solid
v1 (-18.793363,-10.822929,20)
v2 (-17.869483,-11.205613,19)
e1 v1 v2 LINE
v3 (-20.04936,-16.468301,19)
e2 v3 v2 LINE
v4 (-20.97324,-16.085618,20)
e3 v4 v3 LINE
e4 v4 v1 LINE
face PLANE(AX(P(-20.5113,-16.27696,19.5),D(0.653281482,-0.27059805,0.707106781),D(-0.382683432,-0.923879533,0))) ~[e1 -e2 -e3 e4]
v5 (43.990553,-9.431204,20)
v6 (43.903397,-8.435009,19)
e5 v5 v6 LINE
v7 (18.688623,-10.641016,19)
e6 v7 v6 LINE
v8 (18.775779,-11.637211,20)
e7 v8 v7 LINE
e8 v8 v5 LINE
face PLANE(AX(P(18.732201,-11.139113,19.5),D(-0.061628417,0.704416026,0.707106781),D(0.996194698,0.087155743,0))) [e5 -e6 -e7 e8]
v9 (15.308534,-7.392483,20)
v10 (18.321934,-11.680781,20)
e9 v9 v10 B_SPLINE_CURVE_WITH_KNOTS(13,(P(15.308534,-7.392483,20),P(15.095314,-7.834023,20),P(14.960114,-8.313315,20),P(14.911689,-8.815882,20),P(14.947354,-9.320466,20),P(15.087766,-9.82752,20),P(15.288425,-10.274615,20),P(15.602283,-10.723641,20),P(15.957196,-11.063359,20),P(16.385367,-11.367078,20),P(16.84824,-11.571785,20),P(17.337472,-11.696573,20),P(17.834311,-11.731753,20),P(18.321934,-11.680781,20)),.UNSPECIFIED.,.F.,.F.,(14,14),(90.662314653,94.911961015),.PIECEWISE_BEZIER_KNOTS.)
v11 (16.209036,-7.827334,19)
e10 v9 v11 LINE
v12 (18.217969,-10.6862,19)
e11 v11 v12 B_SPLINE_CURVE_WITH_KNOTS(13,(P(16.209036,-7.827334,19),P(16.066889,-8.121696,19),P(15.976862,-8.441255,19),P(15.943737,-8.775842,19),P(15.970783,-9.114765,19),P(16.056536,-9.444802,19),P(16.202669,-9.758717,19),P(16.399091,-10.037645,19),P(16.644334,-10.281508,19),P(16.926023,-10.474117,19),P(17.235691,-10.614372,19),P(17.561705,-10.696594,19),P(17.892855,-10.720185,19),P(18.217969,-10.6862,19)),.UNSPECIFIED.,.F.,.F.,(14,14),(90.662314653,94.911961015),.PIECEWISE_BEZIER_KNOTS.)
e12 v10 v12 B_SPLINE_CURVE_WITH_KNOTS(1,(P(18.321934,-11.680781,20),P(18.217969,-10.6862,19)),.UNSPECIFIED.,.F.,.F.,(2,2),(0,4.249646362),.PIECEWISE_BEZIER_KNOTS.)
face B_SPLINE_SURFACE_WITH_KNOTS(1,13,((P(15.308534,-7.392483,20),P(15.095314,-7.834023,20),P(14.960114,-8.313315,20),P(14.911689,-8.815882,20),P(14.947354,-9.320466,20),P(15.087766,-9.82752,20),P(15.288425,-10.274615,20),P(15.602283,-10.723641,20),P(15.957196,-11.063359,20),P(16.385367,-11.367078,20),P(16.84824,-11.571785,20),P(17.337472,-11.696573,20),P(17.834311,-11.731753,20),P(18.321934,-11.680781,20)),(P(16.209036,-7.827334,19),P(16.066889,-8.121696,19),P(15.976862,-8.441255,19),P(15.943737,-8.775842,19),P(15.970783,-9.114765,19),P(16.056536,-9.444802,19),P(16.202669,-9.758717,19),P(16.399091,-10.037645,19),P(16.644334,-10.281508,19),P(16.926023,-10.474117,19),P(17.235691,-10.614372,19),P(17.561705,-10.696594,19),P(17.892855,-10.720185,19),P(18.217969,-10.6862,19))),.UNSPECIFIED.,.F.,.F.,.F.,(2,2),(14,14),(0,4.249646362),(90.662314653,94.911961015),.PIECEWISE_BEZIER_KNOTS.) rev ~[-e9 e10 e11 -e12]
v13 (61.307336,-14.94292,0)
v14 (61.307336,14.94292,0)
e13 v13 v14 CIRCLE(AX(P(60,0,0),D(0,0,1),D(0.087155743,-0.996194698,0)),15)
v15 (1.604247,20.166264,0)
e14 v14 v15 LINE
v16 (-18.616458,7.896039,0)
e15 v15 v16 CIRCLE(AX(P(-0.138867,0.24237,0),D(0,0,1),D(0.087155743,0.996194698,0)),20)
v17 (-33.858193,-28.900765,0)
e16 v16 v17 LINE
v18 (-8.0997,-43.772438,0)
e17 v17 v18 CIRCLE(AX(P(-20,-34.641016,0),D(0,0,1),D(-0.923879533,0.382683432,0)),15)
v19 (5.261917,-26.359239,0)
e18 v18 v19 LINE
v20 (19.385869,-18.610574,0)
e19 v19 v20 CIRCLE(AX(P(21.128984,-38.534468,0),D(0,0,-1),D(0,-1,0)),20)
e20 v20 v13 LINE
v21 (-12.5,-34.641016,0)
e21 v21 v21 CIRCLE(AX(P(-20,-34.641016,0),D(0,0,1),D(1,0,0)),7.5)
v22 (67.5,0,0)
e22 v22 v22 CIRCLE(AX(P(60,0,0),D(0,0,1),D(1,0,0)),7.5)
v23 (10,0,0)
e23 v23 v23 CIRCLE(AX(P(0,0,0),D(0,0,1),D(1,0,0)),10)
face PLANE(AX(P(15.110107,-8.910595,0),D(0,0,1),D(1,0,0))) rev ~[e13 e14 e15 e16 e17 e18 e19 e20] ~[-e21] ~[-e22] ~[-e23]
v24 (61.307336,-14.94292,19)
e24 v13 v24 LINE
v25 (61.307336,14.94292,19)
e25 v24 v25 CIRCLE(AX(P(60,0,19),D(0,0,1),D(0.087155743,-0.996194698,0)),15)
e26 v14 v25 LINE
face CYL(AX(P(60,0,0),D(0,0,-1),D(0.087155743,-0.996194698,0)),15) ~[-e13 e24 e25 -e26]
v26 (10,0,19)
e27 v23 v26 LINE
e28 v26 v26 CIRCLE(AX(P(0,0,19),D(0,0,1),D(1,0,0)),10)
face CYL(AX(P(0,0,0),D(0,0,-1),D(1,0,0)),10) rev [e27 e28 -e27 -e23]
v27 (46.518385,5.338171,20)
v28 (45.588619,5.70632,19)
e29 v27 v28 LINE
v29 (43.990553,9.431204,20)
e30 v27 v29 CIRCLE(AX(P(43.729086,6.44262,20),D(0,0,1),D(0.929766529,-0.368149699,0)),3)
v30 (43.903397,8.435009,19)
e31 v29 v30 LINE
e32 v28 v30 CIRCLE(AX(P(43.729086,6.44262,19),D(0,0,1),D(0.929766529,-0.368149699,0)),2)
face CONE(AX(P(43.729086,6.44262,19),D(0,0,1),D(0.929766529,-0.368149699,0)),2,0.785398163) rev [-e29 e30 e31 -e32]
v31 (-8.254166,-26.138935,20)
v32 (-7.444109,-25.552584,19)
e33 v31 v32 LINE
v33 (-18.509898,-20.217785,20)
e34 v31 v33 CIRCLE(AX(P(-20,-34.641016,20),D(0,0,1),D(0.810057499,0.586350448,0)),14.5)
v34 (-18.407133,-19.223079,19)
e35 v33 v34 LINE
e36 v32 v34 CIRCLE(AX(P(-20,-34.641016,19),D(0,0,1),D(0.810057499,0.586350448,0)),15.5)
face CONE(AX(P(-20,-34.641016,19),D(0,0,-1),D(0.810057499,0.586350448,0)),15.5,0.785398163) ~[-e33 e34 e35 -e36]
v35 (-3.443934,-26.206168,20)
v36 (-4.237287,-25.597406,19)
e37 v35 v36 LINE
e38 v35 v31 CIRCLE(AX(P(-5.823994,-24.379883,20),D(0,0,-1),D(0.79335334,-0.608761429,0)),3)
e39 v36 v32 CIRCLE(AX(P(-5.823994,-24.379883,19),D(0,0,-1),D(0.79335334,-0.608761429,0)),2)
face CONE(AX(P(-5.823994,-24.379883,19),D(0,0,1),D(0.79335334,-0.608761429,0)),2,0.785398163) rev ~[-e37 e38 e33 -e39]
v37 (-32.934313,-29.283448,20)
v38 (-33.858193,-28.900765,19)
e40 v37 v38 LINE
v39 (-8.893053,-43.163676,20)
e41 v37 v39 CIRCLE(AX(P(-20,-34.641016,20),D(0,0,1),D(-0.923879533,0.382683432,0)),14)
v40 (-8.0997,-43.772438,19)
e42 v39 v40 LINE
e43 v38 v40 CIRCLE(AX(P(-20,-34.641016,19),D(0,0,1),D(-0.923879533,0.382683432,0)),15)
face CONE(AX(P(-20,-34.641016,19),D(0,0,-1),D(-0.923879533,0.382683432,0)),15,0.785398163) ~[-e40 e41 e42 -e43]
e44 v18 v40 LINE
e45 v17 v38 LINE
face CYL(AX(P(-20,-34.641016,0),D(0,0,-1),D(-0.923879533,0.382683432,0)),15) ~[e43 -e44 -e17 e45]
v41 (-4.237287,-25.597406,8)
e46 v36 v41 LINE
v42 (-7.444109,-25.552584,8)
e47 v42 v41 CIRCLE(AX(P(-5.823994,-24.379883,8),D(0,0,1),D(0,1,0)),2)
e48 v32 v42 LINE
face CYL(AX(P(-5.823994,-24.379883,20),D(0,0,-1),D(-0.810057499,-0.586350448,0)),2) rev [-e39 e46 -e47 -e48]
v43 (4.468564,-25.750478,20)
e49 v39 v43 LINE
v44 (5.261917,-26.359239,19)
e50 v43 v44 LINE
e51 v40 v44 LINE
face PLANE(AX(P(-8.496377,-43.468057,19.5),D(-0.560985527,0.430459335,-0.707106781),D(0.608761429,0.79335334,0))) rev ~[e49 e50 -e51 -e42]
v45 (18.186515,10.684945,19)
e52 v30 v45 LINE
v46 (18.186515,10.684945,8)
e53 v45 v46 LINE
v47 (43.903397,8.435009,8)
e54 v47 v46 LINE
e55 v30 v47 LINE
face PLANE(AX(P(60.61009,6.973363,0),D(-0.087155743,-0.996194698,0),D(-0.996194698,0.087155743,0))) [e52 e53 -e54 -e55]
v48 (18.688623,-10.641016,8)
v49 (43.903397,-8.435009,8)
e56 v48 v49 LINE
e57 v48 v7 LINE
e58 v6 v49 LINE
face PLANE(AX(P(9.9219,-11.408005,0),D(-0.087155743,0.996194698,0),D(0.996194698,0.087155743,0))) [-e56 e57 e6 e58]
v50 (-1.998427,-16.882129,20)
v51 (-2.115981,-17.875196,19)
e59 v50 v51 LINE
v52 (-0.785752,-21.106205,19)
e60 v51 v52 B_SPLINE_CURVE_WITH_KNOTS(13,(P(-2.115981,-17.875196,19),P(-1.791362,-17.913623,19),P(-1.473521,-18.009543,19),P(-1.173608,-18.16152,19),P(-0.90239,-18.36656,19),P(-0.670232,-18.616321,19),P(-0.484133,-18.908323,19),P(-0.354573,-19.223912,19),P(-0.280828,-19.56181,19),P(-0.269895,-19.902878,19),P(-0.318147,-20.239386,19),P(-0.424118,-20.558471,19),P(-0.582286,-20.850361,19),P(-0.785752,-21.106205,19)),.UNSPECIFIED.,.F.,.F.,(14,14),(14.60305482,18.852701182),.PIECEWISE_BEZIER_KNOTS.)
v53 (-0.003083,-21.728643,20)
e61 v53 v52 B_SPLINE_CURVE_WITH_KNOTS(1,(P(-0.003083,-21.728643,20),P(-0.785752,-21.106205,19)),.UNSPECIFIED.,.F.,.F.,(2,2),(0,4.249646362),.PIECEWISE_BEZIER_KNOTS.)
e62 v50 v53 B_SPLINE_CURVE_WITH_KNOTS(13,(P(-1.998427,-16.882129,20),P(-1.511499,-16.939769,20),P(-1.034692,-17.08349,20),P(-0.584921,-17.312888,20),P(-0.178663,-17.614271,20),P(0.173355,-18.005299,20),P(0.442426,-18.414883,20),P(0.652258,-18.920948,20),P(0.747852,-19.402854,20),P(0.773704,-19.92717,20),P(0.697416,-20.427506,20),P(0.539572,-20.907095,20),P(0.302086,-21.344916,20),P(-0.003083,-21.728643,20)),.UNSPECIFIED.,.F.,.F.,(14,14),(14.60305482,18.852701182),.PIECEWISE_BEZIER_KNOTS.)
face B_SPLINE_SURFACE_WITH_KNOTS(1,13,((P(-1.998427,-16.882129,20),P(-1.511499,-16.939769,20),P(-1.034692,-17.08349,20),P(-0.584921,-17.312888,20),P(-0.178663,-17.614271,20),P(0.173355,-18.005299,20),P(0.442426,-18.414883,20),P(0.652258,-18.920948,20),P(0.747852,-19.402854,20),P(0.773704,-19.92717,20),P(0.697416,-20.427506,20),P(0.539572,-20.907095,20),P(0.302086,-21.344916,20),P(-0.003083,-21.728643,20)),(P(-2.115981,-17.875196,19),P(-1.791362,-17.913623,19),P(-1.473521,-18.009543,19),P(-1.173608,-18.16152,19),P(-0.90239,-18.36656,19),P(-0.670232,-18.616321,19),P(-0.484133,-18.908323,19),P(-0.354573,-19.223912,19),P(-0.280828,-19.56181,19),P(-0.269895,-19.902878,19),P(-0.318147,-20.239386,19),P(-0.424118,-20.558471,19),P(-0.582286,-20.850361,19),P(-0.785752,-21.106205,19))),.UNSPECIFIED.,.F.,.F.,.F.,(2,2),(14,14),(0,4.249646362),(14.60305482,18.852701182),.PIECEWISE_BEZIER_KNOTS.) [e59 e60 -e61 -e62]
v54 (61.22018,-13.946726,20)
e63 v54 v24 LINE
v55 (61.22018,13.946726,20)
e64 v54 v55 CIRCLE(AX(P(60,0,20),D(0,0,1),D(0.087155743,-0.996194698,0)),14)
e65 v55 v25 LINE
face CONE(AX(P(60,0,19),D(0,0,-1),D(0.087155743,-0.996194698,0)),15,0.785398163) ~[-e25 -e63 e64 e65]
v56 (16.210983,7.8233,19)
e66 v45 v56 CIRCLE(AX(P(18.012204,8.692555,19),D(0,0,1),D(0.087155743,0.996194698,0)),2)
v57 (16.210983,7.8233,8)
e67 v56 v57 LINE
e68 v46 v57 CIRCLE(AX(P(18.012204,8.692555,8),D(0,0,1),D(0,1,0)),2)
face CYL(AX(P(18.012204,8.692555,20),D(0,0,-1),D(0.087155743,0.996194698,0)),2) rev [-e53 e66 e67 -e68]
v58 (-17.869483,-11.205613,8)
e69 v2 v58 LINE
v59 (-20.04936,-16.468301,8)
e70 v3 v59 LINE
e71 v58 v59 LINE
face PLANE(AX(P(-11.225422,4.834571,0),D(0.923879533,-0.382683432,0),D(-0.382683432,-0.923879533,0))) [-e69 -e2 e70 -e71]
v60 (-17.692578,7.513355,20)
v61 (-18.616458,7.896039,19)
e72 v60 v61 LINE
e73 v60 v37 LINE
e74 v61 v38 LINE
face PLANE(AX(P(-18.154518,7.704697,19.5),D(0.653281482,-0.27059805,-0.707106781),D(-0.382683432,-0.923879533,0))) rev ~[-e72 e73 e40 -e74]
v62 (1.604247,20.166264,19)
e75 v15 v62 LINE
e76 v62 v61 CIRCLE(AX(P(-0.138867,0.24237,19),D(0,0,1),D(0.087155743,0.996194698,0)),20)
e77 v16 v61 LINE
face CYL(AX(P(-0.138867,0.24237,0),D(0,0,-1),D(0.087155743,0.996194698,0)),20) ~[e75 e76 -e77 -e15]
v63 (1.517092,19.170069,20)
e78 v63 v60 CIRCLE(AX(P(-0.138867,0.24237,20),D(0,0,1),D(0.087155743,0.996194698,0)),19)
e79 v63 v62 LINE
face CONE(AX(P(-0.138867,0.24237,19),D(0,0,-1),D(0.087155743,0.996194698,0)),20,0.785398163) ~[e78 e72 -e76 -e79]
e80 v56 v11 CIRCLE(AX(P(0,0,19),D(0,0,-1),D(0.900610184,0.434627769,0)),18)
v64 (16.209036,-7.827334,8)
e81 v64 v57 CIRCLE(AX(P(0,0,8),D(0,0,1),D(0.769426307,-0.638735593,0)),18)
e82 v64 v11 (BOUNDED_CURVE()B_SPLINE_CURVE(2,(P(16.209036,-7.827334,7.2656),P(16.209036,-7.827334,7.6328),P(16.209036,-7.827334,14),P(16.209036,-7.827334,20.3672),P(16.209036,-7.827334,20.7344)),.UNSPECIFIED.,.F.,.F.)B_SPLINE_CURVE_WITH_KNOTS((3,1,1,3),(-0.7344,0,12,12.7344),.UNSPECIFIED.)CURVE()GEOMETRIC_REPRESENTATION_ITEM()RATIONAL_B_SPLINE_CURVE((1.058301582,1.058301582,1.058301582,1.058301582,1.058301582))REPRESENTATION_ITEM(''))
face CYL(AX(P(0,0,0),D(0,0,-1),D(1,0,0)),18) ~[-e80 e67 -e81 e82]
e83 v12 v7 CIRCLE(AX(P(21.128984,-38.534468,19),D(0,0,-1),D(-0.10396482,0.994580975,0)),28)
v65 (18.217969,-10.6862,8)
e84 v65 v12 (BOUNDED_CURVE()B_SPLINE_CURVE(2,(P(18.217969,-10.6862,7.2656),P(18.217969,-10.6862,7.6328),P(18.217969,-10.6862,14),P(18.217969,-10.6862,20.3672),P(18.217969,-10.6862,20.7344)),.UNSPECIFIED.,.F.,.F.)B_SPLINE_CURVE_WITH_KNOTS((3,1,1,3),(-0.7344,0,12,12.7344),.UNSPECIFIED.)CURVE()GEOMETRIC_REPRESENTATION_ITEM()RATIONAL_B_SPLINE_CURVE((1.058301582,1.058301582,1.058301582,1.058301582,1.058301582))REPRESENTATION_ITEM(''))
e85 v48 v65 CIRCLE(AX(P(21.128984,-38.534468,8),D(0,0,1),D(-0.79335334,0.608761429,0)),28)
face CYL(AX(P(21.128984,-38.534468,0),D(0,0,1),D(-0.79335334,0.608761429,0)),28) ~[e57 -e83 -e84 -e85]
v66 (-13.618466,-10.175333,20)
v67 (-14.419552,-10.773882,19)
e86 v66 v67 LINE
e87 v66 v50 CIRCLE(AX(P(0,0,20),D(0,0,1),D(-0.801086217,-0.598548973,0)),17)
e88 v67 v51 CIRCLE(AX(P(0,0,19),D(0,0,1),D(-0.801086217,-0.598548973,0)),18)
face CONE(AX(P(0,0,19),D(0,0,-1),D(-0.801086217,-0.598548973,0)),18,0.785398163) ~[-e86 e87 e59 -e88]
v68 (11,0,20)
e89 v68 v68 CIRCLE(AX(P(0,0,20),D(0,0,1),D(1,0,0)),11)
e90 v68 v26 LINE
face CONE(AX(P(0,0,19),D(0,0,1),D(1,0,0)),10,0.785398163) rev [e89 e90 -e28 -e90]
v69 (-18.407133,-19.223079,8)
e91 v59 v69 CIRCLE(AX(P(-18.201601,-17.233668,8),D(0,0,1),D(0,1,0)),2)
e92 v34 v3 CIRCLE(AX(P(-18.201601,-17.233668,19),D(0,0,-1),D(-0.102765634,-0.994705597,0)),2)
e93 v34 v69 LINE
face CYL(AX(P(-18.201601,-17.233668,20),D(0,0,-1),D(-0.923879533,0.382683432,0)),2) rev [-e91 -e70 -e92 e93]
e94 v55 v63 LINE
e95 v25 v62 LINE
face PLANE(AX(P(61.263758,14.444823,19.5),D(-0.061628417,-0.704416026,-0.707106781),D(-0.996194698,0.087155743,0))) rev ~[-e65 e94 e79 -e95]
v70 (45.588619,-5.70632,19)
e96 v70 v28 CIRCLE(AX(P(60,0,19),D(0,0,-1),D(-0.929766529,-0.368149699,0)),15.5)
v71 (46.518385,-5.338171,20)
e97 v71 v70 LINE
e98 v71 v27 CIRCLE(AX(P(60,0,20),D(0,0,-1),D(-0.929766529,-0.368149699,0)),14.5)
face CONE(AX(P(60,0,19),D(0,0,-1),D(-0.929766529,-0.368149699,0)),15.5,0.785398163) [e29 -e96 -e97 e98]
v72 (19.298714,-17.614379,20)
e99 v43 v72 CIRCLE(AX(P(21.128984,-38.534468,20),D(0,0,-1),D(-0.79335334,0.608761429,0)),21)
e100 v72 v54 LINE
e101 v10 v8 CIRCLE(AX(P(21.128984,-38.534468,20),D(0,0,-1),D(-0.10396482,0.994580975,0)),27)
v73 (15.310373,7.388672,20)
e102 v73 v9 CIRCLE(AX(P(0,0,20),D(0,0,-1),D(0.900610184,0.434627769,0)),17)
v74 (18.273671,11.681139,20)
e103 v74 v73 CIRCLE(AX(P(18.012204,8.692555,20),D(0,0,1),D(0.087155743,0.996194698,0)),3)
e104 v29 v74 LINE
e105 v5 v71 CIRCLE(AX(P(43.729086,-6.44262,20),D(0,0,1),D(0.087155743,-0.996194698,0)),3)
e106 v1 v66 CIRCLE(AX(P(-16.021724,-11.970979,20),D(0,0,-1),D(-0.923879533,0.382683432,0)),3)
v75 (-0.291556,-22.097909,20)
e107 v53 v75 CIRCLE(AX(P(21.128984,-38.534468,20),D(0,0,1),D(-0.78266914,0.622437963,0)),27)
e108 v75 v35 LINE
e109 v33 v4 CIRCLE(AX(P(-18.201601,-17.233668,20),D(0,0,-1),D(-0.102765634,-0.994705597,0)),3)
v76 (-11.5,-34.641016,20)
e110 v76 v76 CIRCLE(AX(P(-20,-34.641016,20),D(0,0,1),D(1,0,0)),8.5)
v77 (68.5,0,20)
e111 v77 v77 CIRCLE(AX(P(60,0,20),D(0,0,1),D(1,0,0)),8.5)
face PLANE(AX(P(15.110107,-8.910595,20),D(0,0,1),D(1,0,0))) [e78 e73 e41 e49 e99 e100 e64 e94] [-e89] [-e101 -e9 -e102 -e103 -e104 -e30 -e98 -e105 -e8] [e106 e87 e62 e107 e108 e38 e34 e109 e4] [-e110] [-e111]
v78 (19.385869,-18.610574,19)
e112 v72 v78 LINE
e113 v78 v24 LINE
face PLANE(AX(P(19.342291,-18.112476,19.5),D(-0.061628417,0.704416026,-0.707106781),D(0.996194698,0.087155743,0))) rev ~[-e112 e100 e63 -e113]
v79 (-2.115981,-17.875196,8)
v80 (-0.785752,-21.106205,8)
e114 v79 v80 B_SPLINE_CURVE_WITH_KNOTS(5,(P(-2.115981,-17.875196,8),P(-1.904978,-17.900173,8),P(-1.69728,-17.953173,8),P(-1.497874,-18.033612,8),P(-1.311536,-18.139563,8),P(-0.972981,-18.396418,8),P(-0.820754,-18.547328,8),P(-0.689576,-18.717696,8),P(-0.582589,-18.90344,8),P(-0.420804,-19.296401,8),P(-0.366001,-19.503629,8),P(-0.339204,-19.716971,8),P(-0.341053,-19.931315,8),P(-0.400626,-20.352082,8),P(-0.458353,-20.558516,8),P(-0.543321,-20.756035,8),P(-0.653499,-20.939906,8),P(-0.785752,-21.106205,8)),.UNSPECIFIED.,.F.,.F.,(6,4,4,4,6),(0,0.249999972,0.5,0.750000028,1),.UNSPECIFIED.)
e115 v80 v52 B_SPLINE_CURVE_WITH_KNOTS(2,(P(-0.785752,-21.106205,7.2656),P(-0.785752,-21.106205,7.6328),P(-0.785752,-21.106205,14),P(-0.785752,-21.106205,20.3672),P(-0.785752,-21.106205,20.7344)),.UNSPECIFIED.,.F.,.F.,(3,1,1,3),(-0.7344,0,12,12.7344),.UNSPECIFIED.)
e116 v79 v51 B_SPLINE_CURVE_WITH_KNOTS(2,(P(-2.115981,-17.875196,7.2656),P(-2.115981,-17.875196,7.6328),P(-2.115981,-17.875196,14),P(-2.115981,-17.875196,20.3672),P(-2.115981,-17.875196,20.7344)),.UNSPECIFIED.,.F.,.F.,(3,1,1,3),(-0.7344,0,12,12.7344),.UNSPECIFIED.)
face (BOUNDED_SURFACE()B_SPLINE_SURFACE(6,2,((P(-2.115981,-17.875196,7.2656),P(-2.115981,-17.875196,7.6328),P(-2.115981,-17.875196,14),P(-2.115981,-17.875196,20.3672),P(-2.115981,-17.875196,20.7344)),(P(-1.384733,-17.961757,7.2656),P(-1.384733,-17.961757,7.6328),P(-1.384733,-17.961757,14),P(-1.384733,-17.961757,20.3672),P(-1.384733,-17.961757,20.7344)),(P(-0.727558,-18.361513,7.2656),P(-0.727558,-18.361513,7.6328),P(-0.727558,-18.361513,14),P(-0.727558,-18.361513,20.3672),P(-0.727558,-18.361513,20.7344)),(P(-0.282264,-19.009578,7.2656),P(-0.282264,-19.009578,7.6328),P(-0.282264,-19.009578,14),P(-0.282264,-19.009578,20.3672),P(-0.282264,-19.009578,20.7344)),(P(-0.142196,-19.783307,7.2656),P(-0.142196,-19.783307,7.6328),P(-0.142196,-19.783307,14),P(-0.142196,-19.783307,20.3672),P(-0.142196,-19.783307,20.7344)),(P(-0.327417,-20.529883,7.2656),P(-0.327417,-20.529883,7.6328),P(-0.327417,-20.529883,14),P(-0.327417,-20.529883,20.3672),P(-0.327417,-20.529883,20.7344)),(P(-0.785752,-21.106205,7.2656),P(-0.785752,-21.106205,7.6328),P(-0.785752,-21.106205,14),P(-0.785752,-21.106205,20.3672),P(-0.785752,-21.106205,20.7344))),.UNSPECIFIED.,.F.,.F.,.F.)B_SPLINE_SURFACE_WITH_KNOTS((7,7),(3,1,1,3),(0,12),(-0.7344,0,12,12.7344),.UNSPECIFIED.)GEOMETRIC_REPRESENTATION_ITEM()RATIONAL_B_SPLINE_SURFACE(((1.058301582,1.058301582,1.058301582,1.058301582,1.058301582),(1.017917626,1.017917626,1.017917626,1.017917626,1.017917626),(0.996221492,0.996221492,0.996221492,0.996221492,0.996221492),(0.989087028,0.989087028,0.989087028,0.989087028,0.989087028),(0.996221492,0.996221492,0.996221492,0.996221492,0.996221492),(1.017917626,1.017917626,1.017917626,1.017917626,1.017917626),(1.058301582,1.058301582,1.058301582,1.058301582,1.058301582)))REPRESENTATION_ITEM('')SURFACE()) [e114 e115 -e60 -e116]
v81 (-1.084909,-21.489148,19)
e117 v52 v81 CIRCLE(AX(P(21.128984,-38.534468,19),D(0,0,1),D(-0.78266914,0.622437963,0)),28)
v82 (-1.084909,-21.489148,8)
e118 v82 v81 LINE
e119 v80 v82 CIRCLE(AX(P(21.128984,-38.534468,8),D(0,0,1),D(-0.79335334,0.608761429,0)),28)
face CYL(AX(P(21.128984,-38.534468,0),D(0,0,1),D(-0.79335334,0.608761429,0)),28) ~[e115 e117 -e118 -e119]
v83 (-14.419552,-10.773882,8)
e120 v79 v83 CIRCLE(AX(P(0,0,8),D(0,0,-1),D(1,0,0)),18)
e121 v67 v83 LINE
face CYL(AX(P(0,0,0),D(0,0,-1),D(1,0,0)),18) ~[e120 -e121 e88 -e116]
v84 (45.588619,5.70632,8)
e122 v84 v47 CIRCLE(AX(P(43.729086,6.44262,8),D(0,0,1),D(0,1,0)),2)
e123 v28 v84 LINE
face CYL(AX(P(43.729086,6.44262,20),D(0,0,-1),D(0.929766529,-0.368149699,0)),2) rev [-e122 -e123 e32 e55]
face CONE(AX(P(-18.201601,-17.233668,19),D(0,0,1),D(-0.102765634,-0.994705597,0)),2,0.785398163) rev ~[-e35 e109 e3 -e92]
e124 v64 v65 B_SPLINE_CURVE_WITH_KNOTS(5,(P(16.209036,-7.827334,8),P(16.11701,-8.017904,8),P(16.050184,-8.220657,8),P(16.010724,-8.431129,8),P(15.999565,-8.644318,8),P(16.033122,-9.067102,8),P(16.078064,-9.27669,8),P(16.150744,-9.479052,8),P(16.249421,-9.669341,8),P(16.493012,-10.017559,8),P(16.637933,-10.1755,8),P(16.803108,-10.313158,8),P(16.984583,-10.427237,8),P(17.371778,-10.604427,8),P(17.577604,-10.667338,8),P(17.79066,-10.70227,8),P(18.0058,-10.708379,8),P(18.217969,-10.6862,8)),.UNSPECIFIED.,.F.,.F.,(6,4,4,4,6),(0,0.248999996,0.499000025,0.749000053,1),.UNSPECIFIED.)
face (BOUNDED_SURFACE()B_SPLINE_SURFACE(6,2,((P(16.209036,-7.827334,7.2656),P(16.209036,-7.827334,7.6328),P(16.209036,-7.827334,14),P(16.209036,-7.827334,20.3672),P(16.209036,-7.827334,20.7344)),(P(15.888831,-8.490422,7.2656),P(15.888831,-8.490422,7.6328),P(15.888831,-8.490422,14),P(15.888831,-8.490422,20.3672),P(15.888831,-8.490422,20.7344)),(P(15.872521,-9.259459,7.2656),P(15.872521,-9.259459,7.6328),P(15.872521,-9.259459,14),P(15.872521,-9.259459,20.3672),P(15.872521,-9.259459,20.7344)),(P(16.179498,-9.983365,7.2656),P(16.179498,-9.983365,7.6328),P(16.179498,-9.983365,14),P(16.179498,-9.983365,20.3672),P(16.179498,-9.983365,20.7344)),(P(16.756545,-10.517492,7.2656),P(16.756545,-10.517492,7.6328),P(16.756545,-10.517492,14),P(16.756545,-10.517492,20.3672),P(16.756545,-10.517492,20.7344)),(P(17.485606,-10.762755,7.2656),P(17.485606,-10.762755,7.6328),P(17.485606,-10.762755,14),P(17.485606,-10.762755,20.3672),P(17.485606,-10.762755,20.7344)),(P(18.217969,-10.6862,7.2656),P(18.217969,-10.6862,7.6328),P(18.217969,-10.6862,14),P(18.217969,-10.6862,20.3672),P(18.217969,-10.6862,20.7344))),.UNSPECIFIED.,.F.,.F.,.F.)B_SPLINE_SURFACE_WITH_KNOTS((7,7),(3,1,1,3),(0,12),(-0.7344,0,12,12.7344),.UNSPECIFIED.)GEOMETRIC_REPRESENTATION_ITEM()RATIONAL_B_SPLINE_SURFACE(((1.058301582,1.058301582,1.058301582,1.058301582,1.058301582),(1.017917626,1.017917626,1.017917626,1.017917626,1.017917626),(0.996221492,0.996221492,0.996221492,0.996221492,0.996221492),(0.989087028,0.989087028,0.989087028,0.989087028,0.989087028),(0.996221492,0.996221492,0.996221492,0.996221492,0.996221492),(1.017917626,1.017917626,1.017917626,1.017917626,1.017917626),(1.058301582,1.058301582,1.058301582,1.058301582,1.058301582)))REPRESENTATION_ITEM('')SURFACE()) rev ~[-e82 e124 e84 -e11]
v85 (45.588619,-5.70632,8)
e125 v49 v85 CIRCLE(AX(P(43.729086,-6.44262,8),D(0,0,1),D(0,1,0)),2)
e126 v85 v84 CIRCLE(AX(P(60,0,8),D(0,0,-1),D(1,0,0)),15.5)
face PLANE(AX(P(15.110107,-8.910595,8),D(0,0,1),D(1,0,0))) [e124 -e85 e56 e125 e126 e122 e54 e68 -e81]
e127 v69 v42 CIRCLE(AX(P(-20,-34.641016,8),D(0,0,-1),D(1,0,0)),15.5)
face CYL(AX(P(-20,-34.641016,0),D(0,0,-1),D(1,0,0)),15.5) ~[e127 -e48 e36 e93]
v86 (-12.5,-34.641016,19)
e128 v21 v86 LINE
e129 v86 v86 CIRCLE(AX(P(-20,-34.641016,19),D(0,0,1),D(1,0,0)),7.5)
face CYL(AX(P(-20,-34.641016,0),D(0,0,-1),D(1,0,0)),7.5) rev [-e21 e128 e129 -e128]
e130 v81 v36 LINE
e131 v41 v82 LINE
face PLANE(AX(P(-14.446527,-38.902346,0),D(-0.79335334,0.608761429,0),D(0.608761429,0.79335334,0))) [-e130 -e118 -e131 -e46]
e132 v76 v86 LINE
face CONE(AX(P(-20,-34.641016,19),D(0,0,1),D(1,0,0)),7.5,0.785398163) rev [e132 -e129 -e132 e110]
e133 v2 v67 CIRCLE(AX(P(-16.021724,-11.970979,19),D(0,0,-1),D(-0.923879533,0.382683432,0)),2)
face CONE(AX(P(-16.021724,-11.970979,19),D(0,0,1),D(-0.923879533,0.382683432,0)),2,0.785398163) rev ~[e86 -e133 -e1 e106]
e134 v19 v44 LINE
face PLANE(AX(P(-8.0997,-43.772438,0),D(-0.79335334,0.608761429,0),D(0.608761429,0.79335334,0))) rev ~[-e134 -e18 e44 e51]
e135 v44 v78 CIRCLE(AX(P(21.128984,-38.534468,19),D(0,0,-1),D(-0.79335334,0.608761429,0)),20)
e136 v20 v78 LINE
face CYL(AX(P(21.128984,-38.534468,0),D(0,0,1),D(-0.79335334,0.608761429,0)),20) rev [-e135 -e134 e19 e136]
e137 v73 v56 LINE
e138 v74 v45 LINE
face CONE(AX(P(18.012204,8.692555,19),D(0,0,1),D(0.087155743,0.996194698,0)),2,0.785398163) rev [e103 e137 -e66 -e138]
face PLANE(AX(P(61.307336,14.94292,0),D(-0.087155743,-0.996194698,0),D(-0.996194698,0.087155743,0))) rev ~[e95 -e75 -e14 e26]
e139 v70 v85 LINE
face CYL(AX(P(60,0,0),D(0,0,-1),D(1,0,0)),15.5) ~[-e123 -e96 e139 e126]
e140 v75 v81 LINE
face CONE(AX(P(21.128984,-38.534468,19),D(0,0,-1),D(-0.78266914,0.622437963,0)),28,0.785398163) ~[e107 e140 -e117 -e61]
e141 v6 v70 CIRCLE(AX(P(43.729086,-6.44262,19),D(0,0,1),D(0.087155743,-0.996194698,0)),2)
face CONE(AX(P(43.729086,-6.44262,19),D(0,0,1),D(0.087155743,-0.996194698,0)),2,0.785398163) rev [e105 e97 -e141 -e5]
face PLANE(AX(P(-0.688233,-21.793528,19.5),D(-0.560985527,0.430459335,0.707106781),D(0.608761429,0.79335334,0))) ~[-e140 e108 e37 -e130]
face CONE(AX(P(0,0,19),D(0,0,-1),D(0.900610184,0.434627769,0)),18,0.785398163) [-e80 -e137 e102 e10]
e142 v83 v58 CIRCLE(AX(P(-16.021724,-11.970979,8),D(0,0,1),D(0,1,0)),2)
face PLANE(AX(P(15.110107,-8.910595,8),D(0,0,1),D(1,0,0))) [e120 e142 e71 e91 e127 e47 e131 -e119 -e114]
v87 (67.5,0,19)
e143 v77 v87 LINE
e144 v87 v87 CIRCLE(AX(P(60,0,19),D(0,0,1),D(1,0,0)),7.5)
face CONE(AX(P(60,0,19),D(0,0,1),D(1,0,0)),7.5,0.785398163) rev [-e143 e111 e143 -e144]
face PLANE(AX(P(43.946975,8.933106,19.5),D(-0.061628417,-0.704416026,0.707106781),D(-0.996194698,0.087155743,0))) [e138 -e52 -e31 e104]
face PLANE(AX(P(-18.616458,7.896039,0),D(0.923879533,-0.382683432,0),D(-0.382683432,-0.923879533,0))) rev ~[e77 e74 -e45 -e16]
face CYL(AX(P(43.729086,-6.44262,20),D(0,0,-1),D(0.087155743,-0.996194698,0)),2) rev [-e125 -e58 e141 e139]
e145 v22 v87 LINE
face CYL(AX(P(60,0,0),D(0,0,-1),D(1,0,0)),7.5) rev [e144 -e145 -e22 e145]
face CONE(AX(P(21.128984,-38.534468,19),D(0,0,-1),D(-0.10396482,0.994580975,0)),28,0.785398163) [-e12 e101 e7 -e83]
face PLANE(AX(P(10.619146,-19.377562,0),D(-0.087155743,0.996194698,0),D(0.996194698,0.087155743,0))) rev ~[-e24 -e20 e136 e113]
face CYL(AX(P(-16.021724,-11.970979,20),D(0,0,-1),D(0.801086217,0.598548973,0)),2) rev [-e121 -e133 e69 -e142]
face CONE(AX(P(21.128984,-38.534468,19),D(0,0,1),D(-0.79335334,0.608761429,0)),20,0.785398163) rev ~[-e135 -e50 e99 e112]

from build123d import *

# Parameters (mm, degrees)
F0_R     = 7.5
F0_R_2   = 10
F1_DEPTH = 20
F2_R     = 20
F3_T     = -8
F4_R     = 2
F6_SIZE  = 1


# Not quite as in the source:
# - two fillets or chamfers of one size are made in one step


with BuildPart() as f1:
    # F0 (on Top) → F1 (new body)
    with BuildSketch(Plane.XY):
        with BuildLine():
            Line((-18.6164580262, 7.8960385923), (-33.8581929877, -28.9007646659))
            ThreePointArc((-33.8581929877, -28.9007646659), (-27.5, -47.6313972081), (-8.0996998956, -43.7724375865))
            Line((-8.0996998956, -43.7724375865), (10.6191461494, -19.3775624703))
            Line((10.6191461494, -19.3775624703), (61.3073361412, -14.9429204714))
            ThreePointArc((61.3073361412, -14.9429204714), (75, 0), (61.3073361412, 14.9429204714))
            Line((61.3073361412, 14.9429204714), (1.604247479, 20.1662639068))
            ThreePointArc((1.604247479, 20.1662639068), (-10.5143325391, 17.3406073584), (-18.6164580262, 7.8960385923))
        make_face()
        with Locations((-20, -34.6410161514)):
            Circle(F0_R, mode=Mode.SUBTRACT)
        Circle(F0_R_2, mode=Mode.SUBTRACT)
        with Locations((60, 0)):
            Circle(F0_R, mode=Mode.SUBTRACT)
    extrude(amount=F1_DEPTH)

    # F2
    f2_edges = [f1.edges().sort_by_distance(p)[0] for p in [
        (10.619146, -19.377562, 10),
    ]]
    fillet(f2_edges, radius=F2_R)

    # F3
    f3_openings = [f1.faces().sort_by_distance(p)[0] for p in [
        (14.636401, -7.453279, 20),
    ]]
    offset(amount=F3_T, openings=f3_openings)

    # F4
    f4_edges = [f1.edges().sort_by_distance(p)[0] for p in [
        (-6.027772, -27.930812, 14),
        (13.849674, -11.497241, 14),
        (2.246879, -17.859214, 14),
        (46.833398, -8.178667, 14),
        (-21.174906, -19.185609, 14),
        (-16.348079, -7.532617, 14),
        (14.22329, 11.031682, 14),
        (46.833398, 8.178667, 14),
    ]]
    fillet(f4_edges, radius=F4_R)

    # F6
    f6_edges = [f1.edges().sort_by_distance(p)[0] for p in [
        (40.346603, -16.776747, 20),
        (-10, 0, 20),
        (31.29601, -9.538013, 20),
        (31.044956, 9.559977, 20),
        (17.546547, -4.014808, 20),
        (17.547047, 4.012624, 20),
        (-8.997951, -15.58964, 20),
        (44.5, 0, 20),
        (-27.5, -34.641016, 20),
        (-12.25, -21.217622, 20),
        (-2.661098, -23.543277, 20),
        (-18.959422, -13.836957, 20),
        (52.5, 0, 20),
        (18.453201, -10.662615, 20),
        (16.373656, -9.84693, 20),
        (45.430722, -7.49354, 20),
        (16.366311, 9.828794, 20),
        (45.430722, 7.49354, 20),
        (-1.418891, -35.065838, 20),
        (11.509209, -20.999932, 20),
        (75, 0, 20),
        (31.455792, 17.554592, 20),
        (-10.514333, 17.340607, 20),
        (-26.237326, -10.502363, 20),
        (-27.5, -47.631397, 20),
        (-0.936161, -21.297027, 20),
        (-0.501696, -19.09992, 20),
        (-5.851945, -26.379688, 20),
        (-16.270071, -9.986458, 20),
        (-19.919507, -18.257777, 20),
    ]]
    chamfer(f6_edges, length=F6_SIZE)


solid = f1.part
